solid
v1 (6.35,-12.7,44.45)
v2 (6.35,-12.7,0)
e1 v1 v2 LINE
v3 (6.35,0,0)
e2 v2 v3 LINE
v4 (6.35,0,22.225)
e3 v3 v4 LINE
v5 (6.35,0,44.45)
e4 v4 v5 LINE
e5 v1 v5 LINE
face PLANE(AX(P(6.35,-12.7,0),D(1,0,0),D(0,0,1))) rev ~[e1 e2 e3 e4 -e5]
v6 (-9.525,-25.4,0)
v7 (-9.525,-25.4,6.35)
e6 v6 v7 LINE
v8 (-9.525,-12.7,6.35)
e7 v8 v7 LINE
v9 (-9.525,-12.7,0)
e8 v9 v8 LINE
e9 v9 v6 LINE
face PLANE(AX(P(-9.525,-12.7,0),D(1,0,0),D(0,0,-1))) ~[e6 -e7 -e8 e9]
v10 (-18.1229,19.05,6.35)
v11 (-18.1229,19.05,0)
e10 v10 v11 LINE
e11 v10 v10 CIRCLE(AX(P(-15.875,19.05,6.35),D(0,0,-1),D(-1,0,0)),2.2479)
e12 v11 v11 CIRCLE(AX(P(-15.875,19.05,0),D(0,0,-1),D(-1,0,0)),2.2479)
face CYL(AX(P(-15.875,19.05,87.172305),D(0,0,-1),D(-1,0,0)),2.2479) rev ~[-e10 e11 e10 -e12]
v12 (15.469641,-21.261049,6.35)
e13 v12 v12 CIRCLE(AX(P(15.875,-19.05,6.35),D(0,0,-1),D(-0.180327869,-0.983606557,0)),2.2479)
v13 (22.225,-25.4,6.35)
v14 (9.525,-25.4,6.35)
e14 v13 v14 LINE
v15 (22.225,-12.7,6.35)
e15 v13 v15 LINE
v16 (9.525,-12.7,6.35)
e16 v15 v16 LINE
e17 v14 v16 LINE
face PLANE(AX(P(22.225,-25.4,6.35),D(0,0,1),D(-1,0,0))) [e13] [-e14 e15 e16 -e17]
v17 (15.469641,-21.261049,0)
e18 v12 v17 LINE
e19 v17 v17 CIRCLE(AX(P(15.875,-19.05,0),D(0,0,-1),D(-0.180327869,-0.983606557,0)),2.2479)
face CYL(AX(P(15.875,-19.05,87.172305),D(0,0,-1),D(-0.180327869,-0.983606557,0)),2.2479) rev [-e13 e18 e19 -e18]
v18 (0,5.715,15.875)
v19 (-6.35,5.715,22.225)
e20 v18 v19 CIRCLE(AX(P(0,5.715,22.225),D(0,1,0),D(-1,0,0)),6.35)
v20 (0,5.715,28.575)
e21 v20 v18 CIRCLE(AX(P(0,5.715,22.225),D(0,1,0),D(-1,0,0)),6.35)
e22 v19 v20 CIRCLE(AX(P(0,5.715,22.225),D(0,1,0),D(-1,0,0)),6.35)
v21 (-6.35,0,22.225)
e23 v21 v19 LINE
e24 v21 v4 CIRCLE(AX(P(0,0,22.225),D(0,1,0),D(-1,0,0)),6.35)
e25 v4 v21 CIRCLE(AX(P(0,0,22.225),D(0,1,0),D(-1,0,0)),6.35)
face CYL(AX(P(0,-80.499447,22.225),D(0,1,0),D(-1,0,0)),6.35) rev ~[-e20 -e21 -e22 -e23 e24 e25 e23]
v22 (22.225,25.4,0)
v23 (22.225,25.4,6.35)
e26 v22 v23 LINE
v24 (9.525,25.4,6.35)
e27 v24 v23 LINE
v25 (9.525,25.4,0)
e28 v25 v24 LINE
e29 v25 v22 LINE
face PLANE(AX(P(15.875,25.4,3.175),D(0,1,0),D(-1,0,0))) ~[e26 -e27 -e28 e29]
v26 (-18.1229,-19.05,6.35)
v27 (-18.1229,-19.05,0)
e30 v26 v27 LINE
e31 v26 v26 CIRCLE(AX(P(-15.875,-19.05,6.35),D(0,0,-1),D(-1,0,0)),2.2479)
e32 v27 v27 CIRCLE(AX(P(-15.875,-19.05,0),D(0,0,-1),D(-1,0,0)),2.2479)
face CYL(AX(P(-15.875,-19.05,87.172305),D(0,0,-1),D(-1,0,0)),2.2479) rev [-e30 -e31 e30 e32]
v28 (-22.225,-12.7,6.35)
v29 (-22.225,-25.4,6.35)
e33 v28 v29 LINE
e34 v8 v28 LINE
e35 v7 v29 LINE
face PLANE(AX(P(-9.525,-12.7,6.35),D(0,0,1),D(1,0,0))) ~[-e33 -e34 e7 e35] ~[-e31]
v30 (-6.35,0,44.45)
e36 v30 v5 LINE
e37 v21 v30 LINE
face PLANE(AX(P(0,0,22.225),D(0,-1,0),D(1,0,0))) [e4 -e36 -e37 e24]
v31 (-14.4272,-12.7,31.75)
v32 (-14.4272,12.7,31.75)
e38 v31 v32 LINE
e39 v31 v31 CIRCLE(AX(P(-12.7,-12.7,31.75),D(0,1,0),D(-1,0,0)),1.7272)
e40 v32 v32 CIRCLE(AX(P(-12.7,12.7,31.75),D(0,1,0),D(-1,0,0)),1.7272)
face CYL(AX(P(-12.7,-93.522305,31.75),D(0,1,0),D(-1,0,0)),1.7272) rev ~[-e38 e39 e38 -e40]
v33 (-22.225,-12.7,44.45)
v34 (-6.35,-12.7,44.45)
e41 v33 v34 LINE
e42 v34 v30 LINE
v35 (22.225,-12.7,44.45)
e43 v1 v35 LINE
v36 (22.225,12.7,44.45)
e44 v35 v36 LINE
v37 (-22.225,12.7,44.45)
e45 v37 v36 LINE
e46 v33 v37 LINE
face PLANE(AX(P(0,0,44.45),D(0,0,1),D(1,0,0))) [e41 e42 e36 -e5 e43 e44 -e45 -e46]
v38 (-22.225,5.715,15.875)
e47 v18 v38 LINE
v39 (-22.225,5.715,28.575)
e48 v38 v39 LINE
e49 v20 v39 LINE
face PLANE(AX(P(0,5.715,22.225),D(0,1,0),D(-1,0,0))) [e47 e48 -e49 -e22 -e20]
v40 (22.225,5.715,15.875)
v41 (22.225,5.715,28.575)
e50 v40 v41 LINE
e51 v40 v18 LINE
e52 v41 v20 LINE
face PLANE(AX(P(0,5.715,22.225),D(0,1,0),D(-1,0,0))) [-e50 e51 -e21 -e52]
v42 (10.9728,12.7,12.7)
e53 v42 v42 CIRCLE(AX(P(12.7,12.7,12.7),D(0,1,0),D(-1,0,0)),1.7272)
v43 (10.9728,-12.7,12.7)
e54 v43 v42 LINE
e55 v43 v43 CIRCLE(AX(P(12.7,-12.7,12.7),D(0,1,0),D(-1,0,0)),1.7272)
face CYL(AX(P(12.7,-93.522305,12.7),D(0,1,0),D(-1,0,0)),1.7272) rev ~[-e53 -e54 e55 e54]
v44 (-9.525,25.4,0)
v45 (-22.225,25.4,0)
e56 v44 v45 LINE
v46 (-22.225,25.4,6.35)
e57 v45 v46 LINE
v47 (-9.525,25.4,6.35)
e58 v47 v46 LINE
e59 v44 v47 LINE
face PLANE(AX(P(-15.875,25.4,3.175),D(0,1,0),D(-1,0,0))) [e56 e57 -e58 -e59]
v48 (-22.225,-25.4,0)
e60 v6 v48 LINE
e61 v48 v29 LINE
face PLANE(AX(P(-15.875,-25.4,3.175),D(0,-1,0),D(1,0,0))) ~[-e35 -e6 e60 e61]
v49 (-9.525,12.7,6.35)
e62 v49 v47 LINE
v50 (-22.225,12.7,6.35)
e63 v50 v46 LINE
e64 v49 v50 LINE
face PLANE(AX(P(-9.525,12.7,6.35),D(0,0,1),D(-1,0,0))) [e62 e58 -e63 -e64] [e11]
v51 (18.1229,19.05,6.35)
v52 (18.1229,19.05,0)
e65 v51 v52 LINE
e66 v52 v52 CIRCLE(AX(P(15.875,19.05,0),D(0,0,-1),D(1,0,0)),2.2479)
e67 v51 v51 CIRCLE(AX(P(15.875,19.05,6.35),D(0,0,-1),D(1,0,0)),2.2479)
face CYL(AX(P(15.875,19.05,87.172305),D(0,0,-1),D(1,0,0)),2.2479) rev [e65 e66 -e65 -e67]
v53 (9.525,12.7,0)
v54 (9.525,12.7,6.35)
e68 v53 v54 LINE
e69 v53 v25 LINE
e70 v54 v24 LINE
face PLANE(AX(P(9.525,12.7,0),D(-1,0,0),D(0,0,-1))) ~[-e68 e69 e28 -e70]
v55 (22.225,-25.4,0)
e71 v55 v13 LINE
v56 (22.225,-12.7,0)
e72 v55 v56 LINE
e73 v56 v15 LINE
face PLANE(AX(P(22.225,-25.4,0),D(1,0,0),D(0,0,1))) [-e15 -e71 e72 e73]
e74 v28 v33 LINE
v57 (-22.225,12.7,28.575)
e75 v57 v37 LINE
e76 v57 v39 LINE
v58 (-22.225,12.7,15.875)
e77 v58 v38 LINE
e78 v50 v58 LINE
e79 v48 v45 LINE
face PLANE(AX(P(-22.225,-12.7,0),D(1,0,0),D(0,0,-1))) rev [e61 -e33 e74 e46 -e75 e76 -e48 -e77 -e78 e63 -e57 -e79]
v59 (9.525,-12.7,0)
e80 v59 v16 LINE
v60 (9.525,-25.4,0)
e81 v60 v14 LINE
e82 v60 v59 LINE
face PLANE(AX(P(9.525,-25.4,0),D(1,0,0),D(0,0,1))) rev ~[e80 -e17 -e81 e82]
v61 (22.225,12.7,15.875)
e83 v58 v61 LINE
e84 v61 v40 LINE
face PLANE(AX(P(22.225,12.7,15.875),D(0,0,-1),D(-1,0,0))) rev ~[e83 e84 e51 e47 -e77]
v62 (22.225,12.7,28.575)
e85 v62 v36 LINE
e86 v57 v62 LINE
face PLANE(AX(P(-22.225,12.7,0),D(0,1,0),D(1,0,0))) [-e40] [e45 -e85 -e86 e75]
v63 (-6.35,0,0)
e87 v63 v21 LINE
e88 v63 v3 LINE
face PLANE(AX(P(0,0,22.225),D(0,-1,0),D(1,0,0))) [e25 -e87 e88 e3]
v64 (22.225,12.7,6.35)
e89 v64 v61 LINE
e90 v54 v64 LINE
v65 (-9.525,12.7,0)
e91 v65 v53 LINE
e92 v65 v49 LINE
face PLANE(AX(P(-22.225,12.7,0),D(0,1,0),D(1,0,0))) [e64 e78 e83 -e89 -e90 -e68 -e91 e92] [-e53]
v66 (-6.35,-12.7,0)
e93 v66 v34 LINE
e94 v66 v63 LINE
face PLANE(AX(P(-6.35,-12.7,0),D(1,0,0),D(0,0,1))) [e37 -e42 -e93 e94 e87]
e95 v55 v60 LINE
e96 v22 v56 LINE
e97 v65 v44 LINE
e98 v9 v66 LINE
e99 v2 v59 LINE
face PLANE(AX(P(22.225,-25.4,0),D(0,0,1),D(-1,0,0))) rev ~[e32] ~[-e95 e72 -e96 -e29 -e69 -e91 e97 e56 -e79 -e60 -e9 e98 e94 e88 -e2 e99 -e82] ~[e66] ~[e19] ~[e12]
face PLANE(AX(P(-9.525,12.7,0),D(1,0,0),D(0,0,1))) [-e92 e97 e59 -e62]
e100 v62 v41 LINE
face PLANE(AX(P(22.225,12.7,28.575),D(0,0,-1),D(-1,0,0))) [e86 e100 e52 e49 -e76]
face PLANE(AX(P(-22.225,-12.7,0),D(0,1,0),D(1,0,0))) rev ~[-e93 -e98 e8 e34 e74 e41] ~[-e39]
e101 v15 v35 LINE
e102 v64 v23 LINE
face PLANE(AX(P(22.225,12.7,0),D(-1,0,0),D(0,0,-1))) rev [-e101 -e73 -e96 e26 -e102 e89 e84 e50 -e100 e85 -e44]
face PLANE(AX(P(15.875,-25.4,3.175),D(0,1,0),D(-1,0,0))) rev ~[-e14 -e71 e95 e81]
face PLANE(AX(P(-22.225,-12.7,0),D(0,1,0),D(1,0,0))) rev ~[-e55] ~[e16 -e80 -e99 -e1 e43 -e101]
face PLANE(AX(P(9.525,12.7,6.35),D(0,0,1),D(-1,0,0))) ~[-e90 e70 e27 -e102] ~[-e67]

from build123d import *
from build123d import SkipClean  # not in build123d's __all__

# Parameters (mm, degrees)
F0_W             = 44.45
F0_H             = 25.4
F1_DEPTH         = 44.45
F2_W             = 12.7
F2_H             = 44.45
F3_DEPTH         = 12.7
F4_W             = 44.45
F4_H             = 12.7
F5_DEPTH         = 6.985
F7_D             = 12.7
F8_W             = 12.7
F8_H             = 6.35
F9_DEPTH         = 12.7
F9_COPIES2_COUNT = 2
F9_COPIES2_PITCH = 49.595085
F11_D            = 4.4958
F13_D            = 3.4544


# Not quite as in the source:
# - after a boolean that leaves OpenCascade's solid faulty, fix() repairs it
# - a length typed as a fraction of an inch, garbled in the dataset ("3 / 203.2 mm" for 3/8 in), is restored
# - a pattern or mirror of a feature is missing from the dataset's text; its kind, count and spacing are read off the source's solid


with BuildPart() as f1:
    # F0 (on Top) → F1 (new body)
    with BuildSketch(Plane.XY):
        Rectangle(F0_W, F0_H)
    extrude(amount=F1_DEPTH)

    # F2 (on face) → F3 (cut)
    with BuildSketch(Plane.XZ.offset(12.7)):
        with Locations((0, 22.225)):
            Rectangle(F2_W, F2_H)
    extrude(amount=-F3_DEPTH, mode=Mode.SUBTRACT)

    # F4 (on face) → F5 (cut)
    with BuildSketch(Plane(origin=(0, 12.7, 0), x_dir=(-1, 0, 0), z_dir=(0, 1, 0))):
        with Locations((0, 22.225)):
            Rectangle(F4_W, F4_H)
    extrude(amount=-F5_DEPTH, mode=Mode.SUBTRACT)

    # F7 (through all)
    with Locations(Plane.XZ.offset(12.7)):
        with Locations((0, 22.225)):
            Hole(F7_D / 2)

    # F8 (on face) → F9 (join)
    with BuildSketch(Plane(origin=(0, 12.7, 0), x_dir=(-1, 0, 0), z_dir=(0, 1, 0))):
        with Locations((15.875, 3.175)):
            Rectangle(F8_W, F8_H)
    f9 = extrude(amount=F9_DEPTH)

    # F9_copies: F9 across plane
    add(f9.mirror(Plane(origin=(0, 0, 0), x_dir=(0, 0, -1), z_dir=(0, -1, 0))), clean=False)

    # F9_copies1: F9 across plane
    add(f9.mirror(Plane(origin=(0, 0, 0), x_dir=(0, 0, 1), z_dir=(1, 0, 0))), clean=False)

    # F9_copies2: F9 ×2
    with SkipClean():  # cleaning this boolean's faces spoils the solid; the shape is the same uncleaned
        with Locations(*[Vector(0.6401843997, -0.7682212796, 0) * (i * F9_COPIES2_PITCH) for i in range(1, F9_COPIES2_COUNT)]):
            add(f9, clean=False)

    # F11 (through all)
    with Locations(Plane.XY.offset(6.35)):
        with Locations((-15.875, 19.05)):
            f11 = Hole(F11_D / 2)

    add(f1.part.fix(), mode=Mode.REPLACE)

    # F11_copies: F11 across plane
    add(f11.mirror(Plane(origin=(0, 0, 0), x_dir=(0, 0, -1), z_dir=(0, -1, 0))), clean=False, mode=Mode.SUBTRACT)

    # F11_copies1: F11 across plane
    add(f11.mirror(Plane(origin=(0, 0, 0), x_dir=(0, 0, 1), z_dir=(1, 0, 0))), clean=False, mode=Mode.SUBTRACT)

    # F11_copies2: F11 across plane
    add(f11.mirror(Plane(origin=(0, 0, 0), x_dir=(-0.7682212796, -0.6401843997, 0), z_dir=(0.6401843997, -0.7682212796, 0))), clean=False, mode=Mode.SUBTRACT)

    # F13 (through all)
    with Locations(Plane.XZ.offset(12.7)):
        with Locations((-12.7, 31.75), (12.7, 12.7)):
            Hole(F13_D / 2)


solid = f1.part
